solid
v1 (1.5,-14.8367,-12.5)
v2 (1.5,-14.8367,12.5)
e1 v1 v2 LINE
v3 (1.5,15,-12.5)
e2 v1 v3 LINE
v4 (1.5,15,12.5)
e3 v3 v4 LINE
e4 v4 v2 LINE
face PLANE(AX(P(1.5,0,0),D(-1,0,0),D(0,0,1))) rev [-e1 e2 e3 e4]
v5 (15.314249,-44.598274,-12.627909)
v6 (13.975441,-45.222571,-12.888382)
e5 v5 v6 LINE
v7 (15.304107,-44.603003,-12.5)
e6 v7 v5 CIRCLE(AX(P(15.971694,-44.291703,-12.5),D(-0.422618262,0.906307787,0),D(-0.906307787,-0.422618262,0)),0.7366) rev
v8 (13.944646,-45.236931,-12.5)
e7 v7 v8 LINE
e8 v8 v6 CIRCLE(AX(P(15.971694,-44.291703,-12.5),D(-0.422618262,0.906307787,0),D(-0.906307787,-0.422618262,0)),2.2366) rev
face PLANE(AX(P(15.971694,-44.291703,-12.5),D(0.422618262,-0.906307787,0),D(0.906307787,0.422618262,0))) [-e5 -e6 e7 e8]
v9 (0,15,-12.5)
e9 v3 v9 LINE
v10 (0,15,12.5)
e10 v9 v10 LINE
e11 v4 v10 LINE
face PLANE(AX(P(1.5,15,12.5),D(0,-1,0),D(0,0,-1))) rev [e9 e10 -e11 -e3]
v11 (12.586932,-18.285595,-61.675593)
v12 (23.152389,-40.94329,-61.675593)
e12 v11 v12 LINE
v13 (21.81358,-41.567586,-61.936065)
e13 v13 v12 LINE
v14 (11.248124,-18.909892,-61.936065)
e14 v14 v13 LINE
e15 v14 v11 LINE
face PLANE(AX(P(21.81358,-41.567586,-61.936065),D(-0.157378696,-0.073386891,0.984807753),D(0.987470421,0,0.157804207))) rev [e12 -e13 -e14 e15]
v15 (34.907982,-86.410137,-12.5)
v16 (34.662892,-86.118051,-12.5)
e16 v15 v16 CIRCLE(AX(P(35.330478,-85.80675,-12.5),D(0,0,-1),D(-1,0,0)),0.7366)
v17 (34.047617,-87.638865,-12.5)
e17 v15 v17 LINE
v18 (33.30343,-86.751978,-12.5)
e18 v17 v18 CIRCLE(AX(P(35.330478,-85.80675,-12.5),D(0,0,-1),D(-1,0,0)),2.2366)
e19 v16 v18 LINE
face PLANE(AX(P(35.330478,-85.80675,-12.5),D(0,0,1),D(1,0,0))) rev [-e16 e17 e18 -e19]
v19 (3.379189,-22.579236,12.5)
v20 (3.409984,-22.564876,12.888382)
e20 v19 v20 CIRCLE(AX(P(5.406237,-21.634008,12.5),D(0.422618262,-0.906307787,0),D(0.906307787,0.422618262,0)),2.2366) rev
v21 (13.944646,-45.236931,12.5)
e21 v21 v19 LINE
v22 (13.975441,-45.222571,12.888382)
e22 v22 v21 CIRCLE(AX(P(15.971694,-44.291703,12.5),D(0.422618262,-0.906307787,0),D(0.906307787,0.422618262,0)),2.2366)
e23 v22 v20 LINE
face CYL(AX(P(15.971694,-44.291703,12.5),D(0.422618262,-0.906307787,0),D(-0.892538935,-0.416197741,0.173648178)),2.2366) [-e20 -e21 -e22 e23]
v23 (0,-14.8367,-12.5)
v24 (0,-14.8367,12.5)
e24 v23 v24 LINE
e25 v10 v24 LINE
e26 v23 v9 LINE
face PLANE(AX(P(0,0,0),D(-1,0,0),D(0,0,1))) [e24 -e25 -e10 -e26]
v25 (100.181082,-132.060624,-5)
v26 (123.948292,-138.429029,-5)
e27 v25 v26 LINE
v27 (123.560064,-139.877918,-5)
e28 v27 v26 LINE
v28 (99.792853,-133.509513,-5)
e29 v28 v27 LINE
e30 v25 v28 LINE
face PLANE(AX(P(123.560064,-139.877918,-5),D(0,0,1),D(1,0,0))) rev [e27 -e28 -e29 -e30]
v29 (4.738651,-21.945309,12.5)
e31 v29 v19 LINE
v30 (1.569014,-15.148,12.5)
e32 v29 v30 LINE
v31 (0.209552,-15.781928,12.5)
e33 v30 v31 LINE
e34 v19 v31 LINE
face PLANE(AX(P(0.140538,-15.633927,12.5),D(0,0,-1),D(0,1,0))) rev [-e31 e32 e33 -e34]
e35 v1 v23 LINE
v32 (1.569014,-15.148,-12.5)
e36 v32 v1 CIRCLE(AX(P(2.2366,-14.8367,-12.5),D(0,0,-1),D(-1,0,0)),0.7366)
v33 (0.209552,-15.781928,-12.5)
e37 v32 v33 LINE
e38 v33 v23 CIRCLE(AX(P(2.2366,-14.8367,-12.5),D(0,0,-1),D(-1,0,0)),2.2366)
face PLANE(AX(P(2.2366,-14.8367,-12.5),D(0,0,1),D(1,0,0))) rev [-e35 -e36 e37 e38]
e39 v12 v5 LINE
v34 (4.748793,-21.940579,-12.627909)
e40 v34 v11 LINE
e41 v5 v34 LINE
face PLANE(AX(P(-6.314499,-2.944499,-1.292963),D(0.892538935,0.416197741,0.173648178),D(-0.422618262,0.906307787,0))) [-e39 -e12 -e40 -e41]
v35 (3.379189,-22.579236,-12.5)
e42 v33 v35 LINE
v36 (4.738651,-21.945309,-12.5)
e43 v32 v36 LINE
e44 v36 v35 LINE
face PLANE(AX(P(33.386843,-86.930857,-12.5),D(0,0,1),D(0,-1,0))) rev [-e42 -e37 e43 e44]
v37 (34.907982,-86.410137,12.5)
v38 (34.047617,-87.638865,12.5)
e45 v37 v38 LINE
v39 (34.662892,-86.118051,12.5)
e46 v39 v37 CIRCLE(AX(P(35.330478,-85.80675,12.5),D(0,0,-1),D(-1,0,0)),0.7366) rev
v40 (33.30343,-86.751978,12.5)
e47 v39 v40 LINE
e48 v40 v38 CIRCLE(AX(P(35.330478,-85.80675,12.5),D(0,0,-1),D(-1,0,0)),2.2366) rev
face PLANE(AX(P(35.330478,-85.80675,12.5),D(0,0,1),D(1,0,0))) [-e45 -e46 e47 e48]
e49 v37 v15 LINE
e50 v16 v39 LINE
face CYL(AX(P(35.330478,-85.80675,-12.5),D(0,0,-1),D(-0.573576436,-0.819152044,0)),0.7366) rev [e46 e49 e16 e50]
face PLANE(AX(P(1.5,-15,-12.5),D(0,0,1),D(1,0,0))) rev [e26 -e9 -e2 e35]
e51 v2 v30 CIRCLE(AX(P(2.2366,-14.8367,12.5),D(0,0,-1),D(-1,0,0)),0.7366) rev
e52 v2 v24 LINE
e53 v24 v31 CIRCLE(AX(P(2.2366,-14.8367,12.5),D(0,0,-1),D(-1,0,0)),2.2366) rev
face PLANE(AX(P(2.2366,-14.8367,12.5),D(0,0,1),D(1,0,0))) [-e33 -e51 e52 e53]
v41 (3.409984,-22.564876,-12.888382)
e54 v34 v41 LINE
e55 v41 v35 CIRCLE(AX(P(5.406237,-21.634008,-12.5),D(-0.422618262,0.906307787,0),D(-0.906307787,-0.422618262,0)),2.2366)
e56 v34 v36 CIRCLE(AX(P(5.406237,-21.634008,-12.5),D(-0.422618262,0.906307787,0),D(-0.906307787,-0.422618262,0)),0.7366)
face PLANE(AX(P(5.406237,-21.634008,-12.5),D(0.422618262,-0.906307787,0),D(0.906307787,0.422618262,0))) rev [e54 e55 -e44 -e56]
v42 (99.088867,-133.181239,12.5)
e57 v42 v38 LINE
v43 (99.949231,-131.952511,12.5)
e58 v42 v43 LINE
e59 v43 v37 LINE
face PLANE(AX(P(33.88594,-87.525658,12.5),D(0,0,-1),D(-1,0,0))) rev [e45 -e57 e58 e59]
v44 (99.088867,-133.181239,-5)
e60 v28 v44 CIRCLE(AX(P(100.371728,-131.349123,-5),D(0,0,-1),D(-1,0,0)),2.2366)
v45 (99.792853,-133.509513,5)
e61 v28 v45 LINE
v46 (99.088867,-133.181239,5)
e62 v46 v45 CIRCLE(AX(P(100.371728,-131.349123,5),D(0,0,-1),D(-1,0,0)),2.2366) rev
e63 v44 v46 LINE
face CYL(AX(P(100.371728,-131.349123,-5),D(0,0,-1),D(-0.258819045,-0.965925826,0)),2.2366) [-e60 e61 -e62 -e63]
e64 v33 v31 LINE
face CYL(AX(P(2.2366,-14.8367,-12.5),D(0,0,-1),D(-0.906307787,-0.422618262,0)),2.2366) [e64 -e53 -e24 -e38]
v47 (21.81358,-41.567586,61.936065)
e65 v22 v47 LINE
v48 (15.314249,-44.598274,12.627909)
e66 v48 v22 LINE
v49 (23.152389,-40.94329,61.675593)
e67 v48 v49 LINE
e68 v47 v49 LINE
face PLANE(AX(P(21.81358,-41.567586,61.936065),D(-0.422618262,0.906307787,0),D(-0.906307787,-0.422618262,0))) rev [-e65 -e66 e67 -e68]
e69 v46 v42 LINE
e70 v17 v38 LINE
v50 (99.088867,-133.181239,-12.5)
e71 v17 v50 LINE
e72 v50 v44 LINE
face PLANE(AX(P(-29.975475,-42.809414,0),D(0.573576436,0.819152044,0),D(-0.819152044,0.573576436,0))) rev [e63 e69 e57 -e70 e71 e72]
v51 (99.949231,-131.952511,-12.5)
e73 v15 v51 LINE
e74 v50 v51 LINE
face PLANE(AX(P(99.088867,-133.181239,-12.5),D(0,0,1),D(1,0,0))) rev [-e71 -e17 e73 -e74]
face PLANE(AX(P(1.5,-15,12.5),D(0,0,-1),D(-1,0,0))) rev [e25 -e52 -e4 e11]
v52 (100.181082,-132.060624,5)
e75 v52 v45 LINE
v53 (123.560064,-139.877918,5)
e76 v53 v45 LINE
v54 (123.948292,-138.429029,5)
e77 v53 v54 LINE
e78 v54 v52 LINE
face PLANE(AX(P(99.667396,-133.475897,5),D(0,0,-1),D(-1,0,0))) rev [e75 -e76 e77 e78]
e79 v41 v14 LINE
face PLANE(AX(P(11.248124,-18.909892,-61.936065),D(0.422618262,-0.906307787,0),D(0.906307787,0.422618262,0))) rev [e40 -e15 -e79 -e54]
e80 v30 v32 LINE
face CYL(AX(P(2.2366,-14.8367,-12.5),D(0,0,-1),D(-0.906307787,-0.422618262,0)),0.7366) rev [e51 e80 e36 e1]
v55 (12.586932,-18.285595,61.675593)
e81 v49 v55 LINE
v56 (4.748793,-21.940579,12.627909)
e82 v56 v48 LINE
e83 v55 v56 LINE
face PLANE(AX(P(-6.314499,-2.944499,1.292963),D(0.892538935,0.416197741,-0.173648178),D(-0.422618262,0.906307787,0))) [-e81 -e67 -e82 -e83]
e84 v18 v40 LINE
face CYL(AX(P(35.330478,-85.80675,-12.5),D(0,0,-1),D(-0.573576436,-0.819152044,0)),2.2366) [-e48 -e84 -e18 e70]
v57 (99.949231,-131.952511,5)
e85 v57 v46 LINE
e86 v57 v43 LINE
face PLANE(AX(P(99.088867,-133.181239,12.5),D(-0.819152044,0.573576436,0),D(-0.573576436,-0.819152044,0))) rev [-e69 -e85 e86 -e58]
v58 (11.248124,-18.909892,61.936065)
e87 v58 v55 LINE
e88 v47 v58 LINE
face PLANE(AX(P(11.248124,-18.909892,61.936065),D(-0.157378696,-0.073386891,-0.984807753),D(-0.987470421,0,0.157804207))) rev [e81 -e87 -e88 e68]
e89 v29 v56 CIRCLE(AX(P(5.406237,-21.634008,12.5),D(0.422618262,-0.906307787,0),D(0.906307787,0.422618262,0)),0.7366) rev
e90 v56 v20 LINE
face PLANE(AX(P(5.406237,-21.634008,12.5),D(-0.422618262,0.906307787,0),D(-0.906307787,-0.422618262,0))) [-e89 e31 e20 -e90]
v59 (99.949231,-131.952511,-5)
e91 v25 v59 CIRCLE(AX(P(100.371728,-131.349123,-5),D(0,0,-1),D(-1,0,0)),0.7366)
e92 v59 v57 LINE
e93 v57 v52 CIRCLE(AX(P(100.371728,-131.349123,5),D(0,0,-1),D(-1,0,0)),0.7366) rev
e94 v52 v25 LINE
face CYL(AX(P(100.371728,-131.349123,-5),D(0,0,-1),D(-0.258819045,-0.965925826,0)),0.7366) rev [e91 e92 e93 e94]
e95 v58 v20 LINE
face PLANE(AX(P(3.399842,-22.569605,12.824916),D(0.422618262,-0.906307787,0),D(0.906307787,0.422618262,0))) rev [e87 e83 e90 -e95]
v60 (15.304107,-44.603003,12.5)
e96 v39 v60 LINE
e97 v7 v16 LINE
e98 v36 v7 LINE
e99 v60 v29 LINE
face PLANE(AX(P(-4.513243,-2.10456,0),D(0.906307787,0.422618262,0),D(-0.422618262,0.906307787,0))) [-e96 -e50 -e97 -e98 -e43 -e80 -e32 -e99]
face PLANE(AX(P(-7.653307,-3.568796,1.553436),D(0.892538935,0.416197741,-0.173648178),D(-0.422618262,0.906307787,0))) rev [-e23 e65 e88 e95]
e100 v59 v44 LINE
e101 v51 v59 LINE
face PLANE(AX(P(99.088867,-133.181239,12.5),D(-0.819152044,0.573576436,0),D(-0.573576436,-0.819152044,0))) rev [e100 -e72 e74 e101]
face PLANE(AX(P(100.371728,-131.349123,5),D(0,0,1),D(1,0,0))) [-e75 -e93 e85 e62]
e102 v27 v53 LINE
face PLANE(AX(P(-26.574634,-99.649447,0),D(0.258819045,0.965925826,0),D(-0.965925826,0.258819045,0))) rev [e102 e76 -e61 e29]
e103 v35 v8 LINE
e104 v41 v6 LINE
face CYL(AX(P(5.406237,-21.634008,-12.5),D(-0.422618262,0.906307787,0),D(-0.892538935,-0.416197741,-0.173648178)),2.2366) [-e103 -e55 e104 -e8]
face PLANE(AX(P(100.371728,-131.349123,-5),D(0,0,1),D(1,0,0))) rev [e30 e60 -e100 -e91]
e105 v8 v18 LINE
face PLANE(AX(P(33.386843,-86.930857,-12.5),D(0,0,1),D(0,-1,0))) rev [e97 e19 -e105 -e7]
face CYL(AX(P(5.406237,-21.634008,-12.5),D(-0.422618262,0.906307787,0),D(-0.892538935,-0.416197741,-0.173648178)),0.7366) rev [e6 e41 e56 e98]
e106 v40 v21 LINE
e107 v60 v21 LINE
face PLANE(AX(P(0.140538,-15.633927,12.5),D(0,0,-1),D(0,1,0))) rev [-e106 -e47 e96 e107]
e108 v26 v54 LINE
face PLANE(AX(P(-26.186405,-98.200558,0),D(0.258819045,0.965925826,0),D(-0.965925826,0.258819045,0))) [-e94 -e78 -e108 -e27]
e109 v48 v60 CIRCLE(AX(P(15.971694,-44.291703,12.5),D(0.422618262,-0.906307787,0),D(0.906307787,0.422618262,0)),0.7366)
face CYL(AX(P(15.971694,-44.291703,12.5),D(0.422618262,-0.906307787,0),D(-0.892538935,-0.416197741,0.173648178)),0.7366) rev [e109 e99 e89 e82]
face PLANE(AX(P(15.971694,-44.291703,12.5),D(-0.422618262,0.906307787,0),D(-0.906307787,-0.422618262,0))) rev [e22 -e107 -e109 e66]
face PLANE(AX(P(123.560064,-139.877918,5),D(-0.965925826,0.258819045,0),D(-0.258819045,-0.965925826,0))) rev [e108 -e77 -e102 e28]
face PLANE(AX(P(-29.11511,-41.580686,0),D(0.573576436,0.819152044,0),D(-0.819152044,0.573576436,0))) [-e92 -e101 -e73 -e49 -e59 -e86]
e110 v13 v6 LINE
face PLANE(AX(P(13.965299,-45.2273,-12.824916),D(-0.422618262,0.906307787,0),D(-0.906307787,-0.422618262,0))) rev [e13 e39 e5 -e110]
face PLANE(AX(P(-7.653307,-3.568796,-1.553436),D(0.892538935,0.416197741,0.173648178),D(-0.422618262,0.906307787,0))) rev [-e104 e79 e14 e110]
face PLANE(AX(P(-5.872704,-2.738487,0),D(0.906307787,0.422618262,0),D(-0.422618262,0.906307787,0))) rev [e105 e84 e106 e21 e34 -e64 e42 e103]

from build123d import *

# Parameters (mm, degrees)
SKETCH1_W                    = 25
SKETCH1_H                    = 30
BASE_FLANGE1_DEPTH           = 1.5
EDGE_FLANGE1_STRIP_CUT_DEPTH = 25
EDGE_FLANGE1_DEPTH           = 25
EDGE_FLANGE2_STRIP_CUT_DEPTH = 25
EDGE_FLANGE2_DEPTH           = 25
EDGE_FLANGE3_DEPTH           = 10
EDGE_FLANGE4_DEPTH           = 25
EDGE_FLANGE4_BEND_DEPTH      = 25


# Sheet-metal steps are written as plain solids
with BuildPart() as part:
    # Sketch1 → Base-Flange1 (new body)
    with BuildSketch(Plane(origin=(0, 0, 0), x_dir=(0, 0, -1), z_dir=(1, 0, 0))):
        Rectangle(SKETCH1_W, SKETCH1_H)
    extrude(amount=BASE_FLANGE1_DEPTH)

    # Edge-Flange1 strip (across the edge) → Edge-Flange1 strip cut (cut)
    with BuildSketch(Plane(origin=(1.5, -15, 12.5), x_dir=(0.9063077870366524, 0.4226182617406943, 0), z_dir=(0, 0, -1))):
        Polygon((-4.44875879, 5.991091638), (-1.290447996, -0.781927716), (0.069013684, -0.148000323), (-3.08929711, 6.625019031), align=None)
    extrude(amount=EDGE_FLANGE1_STRIP_CUT_DEPTH, mode=Mode.SUBTRACT)

    # Edge-Flange1 section (across the edge) → Edge-Flange1 (add)
    with BuildSketch(Plane(origin=(1.5, -15, 12.5), x_dir=(0.9063077870366524, 0.4226182617406943, 0), z_dir=(0, 0, -1))):
        with BuildLine():
            Line((-1.5, 0.163300289), (-1.5, 78.667458006))
            Line((-1.5, 78.667458006), (0, 78.667458006))
            Line((0, 78.667458006), (0, 0.163300289))
            ThreePointArc((0, 0.163300289), (0.017460361, 0.003870869), (0.069013684, -0.148000323))
            Line((0.069013684, -0.148000323), (-1.290447996, -0.781927716))
            ThreePointArc((-1.290447996, -0.781927716), (-1.44698365, -0.320788552), (-1.5, 0.163300289))
        make_face()
    extrude(amount=EDGE_FLANGE1_DEPTH)

    # Edge-Flange2 strip (across the edge) → Edge-Flange2 strip cut (cut)
    with BuildSketch(Plane(origin=(34.746304358, -86.296929777, 12.5), x_dir=(0.5735764363510556, 0.8191520442889852, 0), z_dir=(0, 0, -1))):
        Polygon((-4.936952418, 5.551052423), (-1.200352418, -0.920928625), (0.098685688, -0.170928625), (-3.637914312, 6.301052423), align=None)
    extrude(amount=EDGE_FLANGE2_STRIP_CUT_DEPTH, mode=Mode.SUBTRACT)

    # Edge-Flange2 section (across the edge) → Edge-Flange2 (add)
    with BuildSketch(Plane(origin=(34.746304358, -86.296929777, 12.5), x_dir=(0.5735764363510556, 0.8191520442889852, 0), z_dir=(0, 0, -1))):
        with BuildLine():
            Line((-1.5, 0.197371375), (-1.5, 79.598076211))
            Line((-1.5, 79.598076211), (0, 79.598076211))
            Line((0, 79.598076211), (0, 0.197371375))
            ThreePointArc((0, 0.197371375), (0.025099036, 0.006725267), (0.098685688, -0.170928625))
            Line((0.098685688, -0.170928625), (-1.200352418, -0.920928625))
            ThreePointArc((-1.200352418, -0.920928625), (-1.423789703, -0.381503301), (-1.5, 0.197371375))
        make_face()
    extrude(amount=EDGE_FLANGE2_DEPTH)

    # Edge-Flange3 section (across the edge) → Edge-Flange3 (add)
    with BuildSketch(Plane(origin=(100.055624686, -132.027008186, 5), x_dir=(0.2588190451025379, 0.9659258262890636, 0), z_dir=(0, 0, -1))):
        with BuildLine():
            Line((-1.5, 0.129882454), (-1.5, 24.735509529))
            Line((-1.5, 24.735509529), (0, 24.735509529))
            Line((0, 24.735509529), (0, 0.129882454))
            ThreePointArc((0, 0.129882454), (0.011190609, 0.001973206), (0.044422416, -0.122049584))
            Line((0.044422416, -0.122049584), (-1.365116516, -0.635079799))
            ThreePointArc((-1.365116516, -0.635079799), (-1.46602102, -0.25849906), (-1.5, 0.129882454))
        make_face()
    extrude(amount=EDGE_FLANGE3_DEPTH)

    # Edge-Flange4 section (across the edge) → Edge-Flange4 (add)
    with BuildSketch(Plane(origin=(4.738650647, -21.945308726, 12.56444415), x_dir=(0.8925389352890336, 0.41619774072677873, -0.17364817766692378), z_dir=(0.42261826174069417, -0.9063077870366525, 0))):
        with BuildLine():
            Line((-1.5, 0.06444415), (-1.5, 49.868767005))
            Line((-1.5, 49.868767005), (0, 49.868767005))
            Line((0, 49.868767005), (0, 0.06444415))
            ThreePointArc((0, 0.06444415), (0.002802985, 0.000245229), (0.011190609, -0.063465098))
            Line((0.011190609, -0.063465098), (-1.46602102, -0.323937365))
            ThreePointArc((-1.46602102, -0.323937365), (-1.491489062, -0.130488385), (-1.5, 0.06444415))
        make_face()
    extrude(amount=EDGE_FLANGE4_DEPTH)

    # Edge-Flange4 section 2 (across the edge) → Edge-Flange4 bend (add)
    with BuildSketch(Plane(origin=(15.304107191, -44.603003402, -12.56444415), x_dir=(0.8925389352890335, 0.41619774072677895, 0.17364817766692367), z_dir=(-0.4226182617406944, 0.9063077870366524, 0))):
        with BuildLine():
            Line((-1.5, 0.06444415), (-1.5, 49.868767005))
            Line((-1.5, 49.868767005), (0, 49.868767005))
            Line((0, 49.868767005), (0, 0.06444415))
            ThreePointArc((0, 0.06444415), (0.002802985, 0.000245229), (0.011190609, -0.063465098))
            Line((0.011190609, -0.063465098), (-1.46602102, -0.323937365))
            ThreePointArc((-1.46602102, -0.323937365), (-1.491489062, -0.130488385), (-1.5, 0.06444415))
        make_face()
    extrude(amount=EDGE_FLANGE4_BEND_DEPTH)


solid = part.part
